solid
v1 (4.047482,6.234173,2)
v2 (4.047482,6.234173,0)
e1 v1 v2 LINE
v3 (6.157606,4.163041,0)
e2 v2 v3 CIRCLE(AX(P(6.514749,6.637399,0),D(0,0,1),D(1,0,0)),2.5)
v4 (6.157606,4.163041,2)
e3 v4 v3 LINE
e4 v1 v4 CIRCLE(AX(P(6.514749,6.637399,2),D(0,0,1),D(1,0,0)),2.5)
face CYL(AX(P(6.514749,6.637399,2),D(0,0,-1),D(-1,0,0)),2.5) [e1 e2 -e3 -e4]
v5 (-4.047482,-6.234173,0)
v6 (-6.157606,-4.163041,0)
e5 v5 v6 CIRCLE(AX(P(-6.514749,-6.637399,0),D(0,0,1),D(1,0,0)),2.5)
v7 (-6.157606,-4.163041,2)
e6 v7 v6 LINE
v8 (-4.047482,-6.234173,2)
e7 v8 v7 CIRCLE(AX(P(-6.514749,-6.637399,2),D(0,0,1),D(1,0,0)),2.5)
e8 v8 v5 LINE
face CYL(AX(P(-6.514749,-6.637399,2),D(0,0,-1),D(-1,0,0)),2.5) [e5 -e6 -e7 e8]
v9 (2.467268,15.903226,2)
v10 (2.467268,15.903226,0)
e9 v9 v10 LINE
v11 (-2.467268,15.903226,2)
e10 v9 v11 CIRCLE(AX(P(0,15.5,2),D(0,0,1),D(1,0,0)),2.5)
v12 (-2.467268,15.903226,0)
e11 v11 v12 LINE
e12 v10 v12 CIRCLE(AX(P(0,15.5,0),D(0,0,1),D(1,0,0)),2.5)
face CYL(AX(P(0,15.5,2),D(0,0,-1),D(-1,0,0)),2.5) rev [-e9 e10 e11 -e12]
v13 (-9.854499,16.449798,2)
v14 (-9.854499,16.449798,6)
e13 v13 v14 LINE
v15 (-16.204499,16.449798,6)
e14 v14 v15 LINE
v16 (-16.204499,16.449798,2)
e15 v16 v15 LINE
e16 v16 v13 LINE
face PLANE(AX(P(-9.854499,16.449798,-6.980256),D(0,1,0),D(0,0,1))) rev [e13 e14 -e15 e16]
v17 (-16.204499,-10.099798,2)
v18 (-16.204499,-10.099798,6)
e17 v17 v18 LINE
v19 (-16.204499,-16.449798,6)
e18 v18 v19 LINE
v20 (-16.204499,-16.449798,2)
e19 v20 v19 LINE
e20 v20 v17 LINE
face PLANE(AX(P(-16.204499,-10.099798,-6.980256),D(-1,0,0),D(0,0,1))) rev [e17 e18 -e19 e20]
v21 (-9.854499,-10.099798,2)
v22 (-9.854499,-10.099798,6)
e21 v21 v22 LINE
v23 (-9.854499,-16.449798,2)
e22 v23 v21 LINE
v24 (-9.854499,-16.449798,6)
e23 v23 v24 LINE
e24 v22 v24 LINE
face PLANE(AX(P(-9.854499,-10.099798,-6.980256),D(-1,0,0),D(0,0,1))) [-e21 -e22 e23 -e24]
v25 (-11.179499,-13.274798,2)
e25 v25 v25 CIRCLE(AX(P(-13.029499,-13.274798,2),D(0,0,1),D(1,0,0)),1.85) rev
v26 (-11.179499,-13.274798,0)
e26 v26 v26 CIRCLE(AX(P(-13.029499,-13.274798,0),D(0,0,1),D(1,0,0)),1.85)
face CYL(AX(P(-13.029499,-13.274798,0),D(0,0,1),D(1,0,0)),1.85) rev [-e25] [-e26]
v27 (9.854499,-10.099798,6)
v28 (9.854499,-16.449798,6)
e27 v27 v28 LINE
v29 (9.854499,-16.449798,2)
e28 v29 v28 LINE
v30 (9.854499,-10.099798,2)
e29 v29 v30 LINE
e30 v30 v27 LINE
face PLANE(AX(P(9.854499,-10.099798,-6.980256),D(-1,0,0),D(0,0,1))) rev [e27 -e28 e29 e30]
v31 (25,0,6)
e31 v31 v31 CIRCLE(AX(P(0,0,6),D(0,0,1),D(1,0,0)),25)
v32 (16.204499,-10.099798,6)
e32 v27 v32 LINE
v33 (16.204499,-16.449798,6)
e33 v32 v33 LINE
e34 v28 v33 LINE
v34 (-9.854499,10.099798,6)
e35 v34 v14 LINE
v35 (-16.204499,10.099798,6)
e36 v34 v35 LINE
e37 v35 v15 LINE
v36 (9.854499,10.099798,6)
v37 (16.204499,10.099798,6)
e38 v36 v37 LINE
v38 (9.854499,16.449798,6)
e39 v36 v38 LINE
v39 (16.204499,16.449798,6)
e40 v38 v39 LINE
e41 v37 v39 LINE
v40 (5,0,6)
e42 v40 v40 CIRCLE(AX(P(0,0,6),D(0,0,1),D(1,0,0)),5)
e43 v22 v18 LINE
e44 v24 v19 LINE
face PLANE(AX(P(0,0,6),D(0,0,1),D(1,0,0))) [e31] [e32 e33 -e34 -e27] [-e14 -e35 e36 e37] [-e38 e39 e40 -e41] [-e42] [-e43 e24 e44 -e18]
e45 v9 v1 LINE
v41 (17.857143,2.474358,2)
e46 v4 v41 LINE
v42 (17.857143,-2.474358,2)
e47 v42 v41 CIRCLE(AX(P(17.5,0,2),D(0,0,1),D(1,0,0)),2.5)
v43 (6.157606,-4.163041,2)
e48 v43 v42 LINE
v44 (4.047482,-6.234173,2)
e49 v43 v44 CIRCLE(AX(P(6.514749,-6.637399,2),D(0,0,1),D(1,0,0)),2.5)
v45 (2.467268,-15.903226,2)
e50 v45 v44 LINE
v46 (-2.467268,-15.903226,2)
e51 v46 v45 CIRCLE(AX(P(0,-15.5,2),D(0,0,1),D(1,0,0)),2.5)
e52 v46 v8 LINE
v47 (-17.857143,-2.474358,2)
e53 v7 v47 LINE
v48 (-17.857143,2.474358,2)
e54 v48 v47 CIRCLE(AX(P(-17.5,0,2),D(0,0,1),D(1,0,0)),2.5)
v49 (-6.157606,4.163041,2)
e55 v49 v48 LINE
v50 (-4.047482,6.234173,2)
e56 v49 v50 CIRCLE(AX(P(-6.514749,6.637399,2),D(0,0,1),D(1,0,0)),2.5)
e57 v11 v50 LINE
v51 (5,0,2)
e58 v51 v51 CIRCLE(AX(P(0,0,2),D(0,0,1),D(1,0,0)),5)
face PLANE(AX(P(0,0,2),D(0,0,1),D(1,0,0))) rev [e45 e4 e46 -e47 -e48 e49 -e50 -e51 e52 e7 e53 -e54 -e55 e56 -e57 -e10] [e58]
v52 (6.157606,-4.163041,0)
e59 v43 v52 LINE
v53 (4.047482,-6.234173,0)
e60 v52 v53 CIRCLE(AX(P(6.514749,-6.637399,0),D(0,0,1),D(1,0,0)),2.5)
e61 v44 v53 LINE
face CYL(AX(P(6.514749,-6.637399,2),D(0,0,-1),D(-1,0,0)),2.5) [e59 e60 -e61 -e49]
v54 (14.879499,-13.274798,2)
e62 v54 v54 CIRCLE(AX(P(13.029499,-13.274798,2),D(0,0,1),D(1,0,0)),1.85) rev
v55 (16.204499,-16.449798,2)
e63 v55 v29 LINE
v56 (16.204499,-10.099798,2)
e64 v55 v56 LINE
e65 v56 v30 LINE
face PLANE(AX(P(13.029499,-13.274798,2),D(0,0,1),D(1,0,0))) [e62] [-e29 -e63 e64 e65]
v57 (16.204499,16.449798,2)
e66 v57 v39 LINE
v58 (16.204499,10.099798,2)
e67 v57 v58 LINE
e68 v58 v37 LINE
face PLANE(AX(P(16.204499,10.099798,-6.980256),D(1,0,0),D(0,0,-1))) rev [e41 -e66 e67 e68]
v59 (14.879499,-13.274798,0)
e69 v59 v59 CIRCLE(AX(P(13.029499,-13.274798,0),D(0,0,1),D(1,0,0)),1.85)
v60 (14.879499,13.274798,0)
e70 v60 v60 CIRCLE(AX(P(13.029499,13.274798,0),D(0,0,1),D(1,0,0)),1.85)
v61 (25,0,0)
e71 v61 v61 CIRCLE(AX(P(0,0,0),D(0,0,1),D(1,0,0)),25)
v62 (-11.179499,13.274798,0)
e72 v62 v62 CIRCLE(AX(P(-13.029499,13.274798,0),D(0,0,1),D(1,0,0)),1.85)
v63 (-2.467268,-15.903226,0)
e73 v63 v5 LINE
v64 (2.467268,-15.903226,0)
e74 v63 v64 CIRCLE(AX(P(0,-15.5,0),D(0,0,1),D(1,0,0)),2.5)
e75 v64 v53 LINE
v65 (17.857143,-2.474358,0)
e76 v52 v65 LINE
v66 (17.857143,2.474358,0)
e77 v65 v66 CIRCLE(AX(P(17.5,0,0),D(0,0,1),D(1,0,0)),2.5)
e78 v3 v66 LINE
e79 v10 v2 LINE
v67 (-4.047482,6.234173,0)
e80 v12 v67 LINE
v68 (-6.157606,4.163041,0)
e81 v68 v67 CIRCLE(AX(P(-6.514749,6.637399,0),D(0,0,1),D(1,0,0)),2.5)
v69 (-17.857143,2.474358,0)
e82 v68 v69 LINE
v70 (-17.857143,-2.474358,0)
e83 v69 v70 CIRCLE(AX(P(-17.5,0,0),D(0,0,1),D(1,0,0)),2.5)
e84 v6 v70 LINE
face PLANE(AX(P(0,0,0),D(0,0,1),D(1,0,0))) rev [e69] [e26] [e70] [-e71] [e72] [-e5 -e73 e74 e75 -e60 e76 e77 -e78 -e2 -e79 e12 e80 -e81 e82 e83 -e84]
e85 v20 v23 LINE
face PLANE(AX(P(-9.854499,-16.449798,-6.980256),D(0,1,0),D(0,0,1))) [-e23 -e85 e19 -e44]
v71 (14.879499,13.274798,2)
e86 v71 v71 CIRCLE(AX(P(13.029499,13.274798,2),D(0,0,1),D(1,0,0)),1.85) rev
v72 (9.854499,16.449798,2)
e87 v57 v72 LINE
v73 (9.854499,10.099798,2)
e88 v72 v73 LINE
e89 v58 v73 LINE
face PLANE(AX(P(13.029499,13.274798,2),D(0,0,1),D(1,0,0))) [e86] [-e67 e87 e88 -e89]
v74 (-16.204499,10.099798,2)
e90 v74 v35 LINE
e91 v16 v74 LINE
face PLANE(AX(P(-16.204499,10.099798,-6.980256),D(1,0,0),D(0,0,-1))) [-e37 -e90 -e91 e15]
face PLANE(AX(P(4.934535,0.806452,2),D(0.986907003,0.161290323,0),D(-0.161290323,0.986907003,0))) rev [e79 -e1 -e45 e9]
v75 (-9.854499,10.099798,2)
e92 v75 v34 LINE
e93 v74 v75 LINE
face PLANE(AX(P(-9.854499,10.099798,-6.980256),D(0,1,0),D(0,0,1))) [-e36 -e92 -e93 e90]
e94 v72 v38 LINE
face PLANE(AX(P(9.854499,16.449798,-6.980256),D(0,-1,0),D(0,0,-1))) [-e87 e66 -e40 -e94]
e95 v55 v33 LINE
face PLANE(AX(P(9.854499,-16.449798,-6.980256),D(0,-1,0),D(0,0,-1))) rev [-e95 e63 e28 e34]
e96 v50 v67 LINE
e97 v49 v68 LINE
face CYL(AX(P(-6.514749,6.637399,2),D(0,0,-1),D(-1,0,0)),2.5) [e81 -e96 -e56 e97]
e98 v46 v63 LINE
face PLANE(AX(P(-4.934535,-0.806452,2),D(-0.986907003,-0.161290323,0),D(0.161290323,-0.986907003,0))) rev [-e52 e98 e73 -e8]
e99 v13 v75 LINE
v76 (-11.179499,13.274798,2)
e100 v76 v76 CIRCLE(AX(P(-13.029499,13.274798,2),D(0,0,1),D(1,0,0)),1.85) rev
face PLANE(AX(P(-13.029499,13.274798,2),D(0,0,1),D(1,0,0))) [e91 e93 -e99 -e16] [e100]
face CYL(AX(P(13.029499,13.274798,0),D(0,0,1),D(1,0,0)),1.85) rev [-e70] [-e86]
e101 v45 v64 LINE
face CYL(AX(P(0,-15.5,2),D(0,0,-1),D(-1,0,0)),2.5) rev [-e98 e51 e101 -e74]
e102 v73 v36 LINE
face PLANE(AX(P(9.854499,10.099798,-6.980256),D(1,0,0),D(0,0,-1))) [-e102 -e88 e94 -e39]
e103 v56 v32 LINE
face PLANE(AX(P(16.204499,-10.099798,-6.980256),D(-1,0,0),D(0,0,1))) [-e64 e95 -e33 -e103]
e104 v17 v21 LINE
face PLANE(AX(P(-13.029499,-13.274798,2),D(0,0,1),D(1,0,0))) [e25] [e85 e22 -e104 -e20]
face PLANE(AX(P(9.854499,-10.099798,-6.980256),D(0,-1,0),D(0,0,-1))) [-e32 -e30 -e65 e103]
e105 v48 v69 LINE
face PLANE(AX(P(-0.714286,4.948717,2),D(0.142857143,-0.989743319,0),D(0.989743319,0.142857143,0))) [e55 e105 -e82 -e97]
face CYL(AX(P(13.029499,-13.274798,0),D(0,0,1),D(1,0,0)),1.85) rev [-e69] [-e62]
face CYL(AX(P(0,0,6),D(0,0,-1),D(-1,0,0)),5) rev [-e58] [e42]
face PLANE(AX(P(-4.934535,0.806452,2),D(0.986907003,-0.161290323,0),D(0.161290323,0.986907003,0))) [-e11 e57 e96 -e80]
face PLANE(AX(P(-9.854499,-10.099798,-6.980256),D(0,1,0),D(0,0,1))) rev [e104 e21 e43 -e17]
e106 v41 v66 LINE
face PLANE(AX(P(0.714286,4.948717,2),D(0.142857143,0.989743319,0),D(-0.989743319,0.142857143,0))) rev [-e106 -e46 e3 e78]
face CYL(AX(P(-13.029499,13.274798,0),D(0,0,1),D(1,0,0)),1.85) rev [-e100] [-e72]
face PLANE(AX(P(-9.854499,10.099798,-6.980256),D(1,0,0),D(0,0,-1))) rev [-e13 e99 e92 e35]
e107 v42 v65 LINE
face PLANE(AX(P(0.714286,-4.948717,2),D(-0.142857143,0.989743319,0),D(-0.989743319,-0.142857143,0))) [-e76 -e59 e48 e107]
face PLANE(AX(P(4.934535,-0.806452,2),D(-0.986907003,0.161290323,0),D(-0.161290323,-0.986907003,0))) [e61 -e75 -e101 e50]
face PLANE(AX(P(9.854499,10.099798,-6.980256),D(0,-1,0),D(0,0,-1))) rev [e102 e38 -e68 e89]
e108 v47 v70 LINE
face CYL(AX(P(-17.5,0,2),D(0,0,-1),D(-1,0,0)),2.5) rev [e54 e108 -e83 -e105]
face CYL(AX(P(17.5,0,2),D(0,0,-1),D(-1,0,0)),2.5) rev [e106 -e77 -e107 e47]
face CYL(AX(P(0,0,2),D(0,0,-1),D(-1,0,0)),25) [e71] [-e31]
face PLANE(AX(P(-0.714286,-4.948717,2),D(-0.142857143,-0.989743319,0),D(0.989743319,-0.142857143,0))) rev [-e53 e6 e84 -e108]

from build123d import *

# Parameters (mm, degrees)
BOSS_EXTRUDE1_OUTLINE_R = 25
BOSS_EXTRUDE1_DEPTH     = 2
SKETCH4_R               = 25
SKETCH4_R_2             = 5
BOSS_EXTRUDE2_DEPTH     = 4
SKETCH5_R               = 1.85
CUT_EXTRUDE1_DEPTH      = 36.860842154
SKETCH6_R               = 3
CUT_EXTRUDE2_DEPTH      = 4
SKETCH7_W               = 6.35
SKETCH7_H               = 6.35
CUT_EXTRUDE3_DEPTH      = 4


# Read off the part's stored shape, not the designer's step: Boss-Extrude1
with BuildPart() as part:
    # Boss-Extrude1 outline → Boss-Extrude1 (new body)
    with BuildSketch(Plane.XY):
        Circle(BOSS_EXTRUDE1_OUTLINE_R)
        with BuildLine():
            ThreePointArc((4.047481829, 6.234173406), (4.763543773, 4.853224592), (6.157606479, 4.163040916))
            Line((6.157606479, 4.163040916), (17.857142857, 2.474358297))
            ThreePointArc((17.857142857, 2.474358297), (20, 0), (17.857142857, -2.474358297))
            Line((17.857142857, -2.474358297), (6.157606479, -4.163040916))
            ThreePointArc((6.157606479, -4.163040916), (4.763543773, -4.853224592), (4.047481829, -6.234173406))
            Line((4.047481829, -6.234173406), (2.467267507, -15.903225806))
            ThreePointArc((2.467267507, -15.903225806), (0, -18), (-2.467267507, -15.903225806))
            Line((-2.467267507, -15.903225806), (-4.047481829, -6.234173406))
            ThreePointArc((-4.047481829, -6.234173406), (-4.763543773, -4.853224592), (-6.157606479, -4.163040916))
            Line((-6.157606479, -4.163040916), (-17.857142857, -2.474358297))
            ThreePointArc((-17.857142857, -2.474358297), (-20, 0), (-17.857142857, 2.474358297))
            Line((-17.857142857, 2.474358297), (-6.157606479, 4.163040916))
            ThreePointArc((-6.157606479, 4.163040916), (-4.763543773, 4.853224592), (-4.047481829, 6.234173406))
            Line((-4.047481829, 6.234173406), (-2.467267507, 15.903225806))
            ThreePointArc((-2.467267507, 15.903225806), (0, 18), (2.467267507, 15.903225806))
            Line((2.467267507, 15.903225806), (4.047481829, 6.234173406))
        make_face(mode=Mode.SUBTRACT)
    extrude(amount=BOSS_EXTRUDE1_DEPTH)

    # Sketch4 → Boss-Extrude2 (add)
    with BuildSketch(Plane.XY.offset(2)):
        Circle(SKETCH4_R)
        Circle(SKETCH4_R_2, mode=Mode.SUBTRACT)
    extrude(amount=BOSS_EXTRUDE2_DEPTH)

    # Sketch5 → Cut-Extrude1 (cut, through all)
    with BuildSketch(Plane.XY.offset(6)):
        with Locations((13.029498672, 13.274798425)):
            Circle(SKETCH5_R)
        with Locations((-13.029498672, 13.274798425)):
            Circle(SKETCH5_R)
        with Locations((-13.029498672, -13.274798425)):
            Circle(SKETCH5_R)
        with Locations((13.029498672, -13.274798425)):
            Circle(SKETCH5_R)
    extrude(amount=-CUT_EXTRUDE1_DEPTH, mode=Mode.SUBTRACT)

    # Sketch6 → Cut-Extrude2 (cut)
    with BuildSketch(Plane.XY.offset(6)):
        with Locations((-13.029498672, -13.274798425)):
            Circle(SKETCH6_R)
        with Locations((13.029498672, -13.274798425)):
            Circle(SKETCH6_R)
        with Locations((13.029498672, 13.274798425)):
            Circle(SKETCH6_R)
        with Locations((-13.029498672, 13.274798425)):
            Circle(SKETCH6_R)
    extrude(amount=-CUT_EXTRUDE2_DEPTH, mode=Mode.SUBTRACT)

    # Sketch7 → Cut-Extrude3 (cut)
    with BuildSketch(Plane.XY.offset(6)):
        with Locations((13.029498672, 13.274798425)):
            Rectangle(SKETCH7_W, SKETCH7_H)
        with Locations((13.029498672, -13.274798425)):
            Rectangle(SKETCH7_W, SKETCH7_H)
        with Locations((-13.029498672, -13.274798425)):
            Rectangle(SKETCH7_W, SKETCH7_H)
        with Locations((-13.029498672, 13.274798425)):
            Rectangle(SKETCH7_W, SKETCH7_H)
    extrude(amount=-CUT_EXTRUDE3_DEPTH, mode=Mode.SUBTRACT)


solid = part.part
